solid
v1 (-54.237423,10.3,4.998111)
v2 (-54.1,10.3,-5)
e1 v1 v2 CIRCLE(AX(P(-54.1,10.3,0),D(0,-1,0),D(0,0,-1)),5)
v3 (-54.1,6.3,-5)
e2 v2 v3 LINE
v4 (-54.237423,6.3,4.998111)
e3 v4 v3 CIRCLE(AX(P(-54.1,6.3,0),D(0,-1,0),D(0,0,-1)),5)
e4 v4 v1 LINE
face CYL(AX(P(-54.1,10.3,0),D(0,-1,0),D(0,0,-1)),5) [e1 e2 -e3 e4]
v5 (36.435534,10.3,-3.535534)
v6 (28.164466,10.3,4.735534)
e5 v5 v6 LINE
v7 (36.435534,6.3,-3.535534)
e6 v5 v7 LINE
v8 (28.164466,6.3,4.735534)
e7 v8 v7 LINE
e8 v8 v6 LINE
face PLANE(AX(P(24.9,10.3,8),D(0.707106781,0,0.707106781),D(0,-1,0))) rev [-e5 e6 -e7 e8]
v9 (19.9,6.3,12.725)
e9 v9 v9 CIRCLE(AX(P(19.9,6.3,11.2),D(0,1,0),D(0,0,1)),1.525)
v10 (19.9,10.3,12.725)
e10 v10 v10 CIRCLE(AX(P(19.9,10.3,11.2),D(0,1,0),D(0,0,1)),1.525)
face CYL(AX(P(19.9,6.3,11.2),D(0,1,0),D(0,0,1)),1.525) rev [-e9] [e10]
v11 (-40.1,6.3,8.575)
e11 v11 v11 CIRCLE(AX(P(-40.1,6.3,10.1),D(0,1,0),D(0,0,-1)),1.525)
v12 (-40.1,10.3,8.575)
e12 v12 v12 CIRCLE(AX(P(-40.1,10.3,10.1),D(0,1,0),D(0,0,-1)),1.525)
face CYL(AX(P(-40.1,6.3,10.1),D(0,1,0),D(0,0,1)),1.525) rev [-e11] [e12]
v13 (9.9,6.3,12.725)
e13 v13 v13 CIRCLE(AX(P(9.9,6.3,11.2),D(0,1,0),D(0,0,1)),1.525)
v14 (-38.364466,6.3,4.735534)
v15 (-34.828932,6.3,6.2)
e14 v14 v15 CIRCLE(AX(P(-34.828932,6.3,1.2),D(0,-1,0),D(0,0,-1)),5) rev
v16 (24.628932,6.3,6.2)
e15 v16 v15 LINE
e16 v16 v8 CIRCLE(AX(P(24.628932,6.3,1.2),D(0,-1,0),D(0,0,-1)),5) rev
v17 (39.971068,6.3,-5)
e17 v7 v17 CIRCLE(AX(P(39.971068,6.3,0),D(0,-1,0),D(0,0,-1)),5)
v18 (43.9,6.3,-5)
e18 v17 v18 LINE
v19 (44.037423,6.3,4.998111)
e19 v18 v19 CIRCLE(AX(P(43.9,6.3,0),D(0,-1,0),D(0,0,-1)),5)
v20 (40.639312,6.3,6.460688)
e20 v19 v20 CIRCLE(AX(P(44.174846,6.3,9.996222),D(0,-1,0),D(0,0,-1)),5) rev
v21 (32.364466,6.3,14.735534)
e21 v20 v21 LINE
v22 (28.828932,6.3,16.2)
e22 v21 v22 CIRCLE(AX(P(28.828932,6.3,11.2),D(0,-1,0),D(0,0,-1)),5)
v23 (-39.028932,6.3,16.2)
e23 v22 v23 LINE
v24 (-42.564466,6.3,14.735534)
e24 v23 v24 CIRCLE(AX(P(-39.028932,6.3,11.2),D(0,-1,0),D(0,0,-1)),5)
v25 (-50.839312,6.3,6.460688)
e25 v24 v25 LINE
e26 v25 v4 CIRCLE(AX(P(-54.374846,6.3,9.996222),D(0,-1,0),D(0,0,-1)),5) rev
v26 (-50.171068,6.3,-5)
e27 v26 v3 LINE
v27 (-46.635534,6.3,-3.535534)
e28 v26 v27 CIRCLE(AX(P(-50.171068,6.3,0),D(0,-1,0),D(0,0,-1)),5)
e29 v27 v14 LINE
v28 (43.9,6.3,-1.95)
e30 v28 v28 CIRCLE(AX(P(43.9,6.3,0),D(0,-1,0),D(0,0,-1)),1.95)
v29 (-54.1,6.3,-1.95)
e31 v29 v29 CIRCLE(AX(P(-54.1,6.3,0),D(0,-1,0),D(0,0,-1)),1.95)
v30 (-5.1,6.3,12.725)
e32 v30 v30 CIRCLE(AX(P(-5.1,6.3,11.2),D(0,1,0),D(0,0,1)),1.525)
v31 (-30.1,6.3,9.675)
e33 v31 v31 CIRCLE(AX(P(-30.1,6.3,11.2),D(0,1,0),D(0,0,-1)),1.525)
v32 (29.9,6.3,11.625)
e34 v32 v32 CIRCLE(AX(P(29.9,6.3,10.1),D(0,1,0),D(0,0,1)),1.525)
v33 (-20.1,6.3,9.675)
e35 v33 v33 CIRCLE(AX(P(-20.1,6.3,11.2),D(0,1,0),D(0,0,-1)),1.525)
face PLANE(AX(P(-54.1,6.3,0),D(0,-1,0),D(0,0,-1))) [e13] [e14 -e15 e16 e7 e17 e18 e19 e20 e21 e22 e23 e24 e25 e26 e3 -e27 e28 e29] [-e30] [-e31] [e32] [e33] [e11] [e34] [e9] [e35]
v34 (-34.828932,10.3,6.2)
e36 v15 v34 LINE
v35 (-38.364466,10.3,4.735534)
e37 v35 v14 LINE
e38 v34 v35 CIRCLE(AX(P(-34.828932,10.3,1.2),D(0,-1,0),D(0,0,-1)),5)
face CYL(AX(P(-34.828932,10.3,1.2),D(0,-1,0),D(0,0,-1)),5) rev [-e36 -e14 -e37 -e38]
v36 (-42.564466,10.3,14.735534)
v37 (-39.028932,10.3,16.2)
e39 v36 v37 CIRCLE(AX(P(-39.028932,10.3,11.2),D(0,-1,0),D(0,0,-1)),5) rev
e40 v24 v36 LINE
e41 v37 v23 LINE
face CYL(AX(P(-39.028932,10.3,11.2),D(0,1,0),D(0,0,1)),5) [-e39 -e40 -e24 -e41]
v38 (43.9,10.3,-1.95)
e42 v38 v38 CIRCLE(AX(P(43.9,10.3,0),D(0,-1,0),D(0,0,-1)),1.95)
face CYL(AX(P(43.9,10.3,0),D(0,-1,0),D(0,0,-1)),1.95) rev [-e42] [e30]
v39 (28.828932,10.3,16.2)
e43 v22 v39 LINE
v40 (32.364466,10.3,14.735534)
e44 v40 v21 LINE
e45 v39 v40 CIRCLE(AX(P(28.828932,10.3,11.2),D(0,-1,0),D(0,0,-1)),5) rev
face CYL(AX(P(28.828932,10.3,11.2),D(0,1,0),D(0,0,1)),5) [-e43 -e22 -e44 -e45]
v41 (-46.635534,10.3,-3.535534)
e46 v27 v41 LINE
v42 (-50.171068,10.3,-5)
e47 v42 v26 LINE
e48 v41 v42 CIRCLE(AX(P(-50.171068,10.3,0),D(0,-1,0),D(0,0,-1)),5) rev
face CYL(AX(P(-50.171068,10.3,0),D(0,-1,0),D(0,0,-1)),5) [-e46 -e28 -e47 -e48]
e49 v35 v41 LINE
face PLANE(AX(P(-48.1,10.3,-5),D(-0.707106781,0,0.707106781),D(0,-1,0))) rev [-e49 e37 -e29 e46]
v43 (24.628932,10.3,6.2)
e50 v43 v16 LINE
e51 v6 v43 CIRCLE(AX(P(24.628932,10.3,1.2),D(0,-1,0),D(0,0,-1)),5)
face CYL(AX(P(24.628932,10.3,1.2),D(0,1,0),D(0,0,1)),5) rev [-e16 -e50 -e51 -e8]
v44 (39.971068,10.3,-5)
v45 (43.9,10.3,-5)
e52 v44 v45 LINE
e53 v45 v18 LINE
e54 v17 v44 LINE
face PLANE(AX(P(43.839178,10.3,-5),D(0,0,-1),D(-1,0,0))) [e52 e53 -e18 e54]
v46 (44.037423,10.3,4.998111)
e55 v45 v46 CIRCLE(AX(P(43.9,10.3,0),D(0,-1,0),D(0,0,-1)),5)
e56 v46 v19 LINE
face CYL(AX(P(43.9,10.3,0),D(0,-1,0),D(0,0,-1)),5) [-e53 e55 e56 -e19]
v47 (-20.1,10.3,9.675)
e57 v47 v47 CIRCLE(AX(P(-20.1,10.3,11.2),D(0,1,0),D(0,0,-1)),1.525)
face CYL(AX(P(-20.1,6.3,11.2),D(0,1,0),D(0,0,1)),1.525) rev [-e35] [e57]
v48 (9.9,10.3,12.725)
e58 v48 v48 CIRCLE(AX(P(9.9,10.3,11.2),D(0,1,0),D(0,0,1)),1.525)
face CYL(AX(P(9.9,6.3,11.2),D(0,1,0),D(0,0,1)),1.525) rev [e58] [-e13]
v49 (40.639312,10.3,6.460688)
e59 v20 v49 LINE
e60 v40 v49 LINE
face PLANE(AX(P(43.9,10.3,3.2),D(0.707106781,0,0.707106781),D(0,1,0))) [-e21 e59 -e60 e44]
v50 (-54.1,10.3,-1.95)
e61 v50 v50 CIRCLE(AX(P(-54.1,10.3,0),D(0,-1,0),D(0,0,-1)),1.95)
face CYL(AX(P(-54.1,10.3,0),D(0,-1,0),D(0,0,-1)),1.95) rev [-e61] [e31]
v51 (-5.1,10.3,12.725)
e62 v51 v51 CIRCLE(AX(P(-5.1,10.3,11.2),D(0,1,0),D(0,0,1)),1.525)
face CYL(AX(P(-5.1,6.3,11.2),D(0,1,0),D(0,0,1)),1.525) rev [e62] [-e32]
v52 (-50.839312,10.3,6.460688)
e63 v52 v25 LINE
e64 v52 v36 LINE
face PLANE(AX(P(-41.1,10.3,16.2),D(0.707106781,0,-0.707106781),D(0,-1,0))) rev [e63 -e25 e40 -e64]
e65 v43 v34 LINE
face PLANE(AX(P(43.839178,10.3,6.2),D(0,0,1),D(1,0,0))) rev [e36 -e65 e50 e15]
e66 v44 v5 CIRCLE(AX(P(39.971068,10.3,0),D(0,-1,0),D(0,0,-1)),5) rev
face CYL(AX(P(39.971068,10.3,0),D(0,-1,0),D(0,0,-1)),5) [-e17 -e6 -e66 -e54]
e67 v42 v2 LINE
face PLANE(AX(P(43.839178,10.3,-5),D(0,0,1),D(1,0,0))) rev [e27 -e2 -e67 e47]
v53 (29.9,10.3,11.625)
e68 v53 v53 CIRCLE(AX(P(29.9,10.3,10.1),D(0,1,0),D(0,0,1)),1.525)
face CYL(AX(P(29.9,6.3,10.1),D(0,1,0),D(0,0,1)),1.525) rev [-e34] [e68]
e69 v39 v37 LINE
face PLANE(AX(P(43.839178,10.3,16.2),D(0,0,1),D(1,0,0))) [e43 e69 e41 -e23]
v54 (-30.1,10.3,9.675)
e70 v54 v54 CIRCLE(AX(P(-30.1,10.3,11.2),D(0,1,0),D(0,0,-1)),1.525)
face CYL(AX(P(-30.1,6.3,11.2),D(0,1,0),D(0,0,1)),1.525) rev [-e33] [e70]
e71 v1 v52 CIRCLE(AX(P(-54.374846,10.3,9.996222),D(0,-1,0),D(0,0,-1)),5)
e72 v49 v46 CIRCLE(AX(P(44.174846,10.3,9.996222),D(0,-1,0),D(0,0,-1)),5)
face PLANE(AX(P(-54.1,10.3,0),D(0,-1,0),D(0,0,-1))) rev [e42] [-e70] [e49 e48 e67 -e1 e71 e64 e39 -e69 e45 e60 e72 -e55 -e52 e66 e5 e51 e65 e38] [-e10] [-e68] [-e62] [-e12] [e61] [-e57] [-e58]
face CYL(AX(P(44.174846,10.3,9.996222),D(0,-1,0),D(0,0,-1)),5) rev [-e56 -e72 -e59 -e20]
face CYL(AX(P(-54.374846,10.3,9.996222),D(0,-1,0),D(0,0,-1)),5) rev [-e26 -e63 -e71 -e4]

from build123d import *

# Parameters (mm, degrees)
BOSS_EXTRUDE1_START = 6.3
SKETCH1_R           = 1.95
BOSS_EXTRUDE1_DEPTH = 4
CHAMFER1_SIZE       = 13
CHAMFER2_SIZE       = 13
FILLET1_R           = 5
SKETCH2_R           = 1.525
CUT_EXTRUDE1_DEPTH  = 62.410503988


with BuildPart() as part:
    # Sketch1 → Boss-Extrude1 (new body)
    with BuildSketch(Plane(origin=(0, 0, 0), x_dir=(1, 0, 0), z_dir=(0, 1, 0)).offset(BOSS_EXTRUDE1_START)):
        with BuildLine():
            Line((-54.1, -5), (-54.1, -16.2))
            Line((-54.1, -16.2), (43.9, -16.2))
            Line((43.9, -16.2), (43.9, -5))
            ThreePointArc((43.9, -5), (48.9, 0), (43.9, 5))
            Line((43.9, 5), (24.9, 5))
            Line((24.9, 5), (24.9, -6.2))
            Line((24.9, -6.2), (-35.1, -6.2))
            Line((-35.1, -6.2), (-35.1, 5))
            Line((-35.1, 5), (-54.1, 5))
            ThreePointArc((-54.1, 5), (-59.1, 0), (-54.1, -5))
        make_face()
        with Locations(Location((43.9, 0, 0), (0, 0, 90))):
            Circle(SKETCH1_R, mode=Mode.SUBTRACT)
        with Locations(Location((-54.1, 0, 0), (0, 0, 90))):
            Circle(SKETCH1_R, mode=Mode.SUBTRACT)
    extrude(amount=BOSS_EXTRUDE1_DEPTH)

    # Chamfer1
    # the kernel refuses this chamfer: 13 mm, written as the material it takes off along each edge
    with BuildSketch(Plane(origin=(24.9, -27.131878844, -5), x_dir=(0.9996219169112968, 0, -0.027495876610586358), z_dir=(0, 1, 0))) as chamfer1_piece_1_section:
        Polygon((CHAMFER1_SIZE * 0.999621916911, -CHAMFER1_SIZE * 0.0274958766106), (-CHAMFER1_SIZE * 0.0274958766106, -CHAMFER1_SIZE * 0.999621916911), (0, 0), align=None)
    chamfer1_piece_1 = extrude(amount=70.863757687, mode=Mode.PRIVATE)
    chamfer1_piece_1 = split(chamfer1_piece_1, bisect_by=Plane(origin=(29.309865353, 8.3, 6.2), z_dir=(0, 0, -1)), keep=Keep.TOP, mode=Mode.PRIVATE)
    add(chamfer1_piece_1, mode=Mode.SUBTRACT)
    with BuildSketch(Plane(origin=(-35.1, -27.131878844, -5), x_dir=(0.027495876610586424, 0, 0.9996219169112968), z_dir=(0, 1, 0))) as chamfer1_piece_2_section:
        Polygon((CHAMFER1_SIZE * 0.999621916911, -CHAMFER1_SIZE * 0.0274958766106), (-CHAMFER1_SIZE * 0.0274958766106, -CHAMFER1_SIZE * 0.999621916911), (0, 0), align=None)
    chamfer1_piece_2 = extrude(amount=70.863757687, mode=Mode.PRIVATE)
    chamfer1_piece_2 = split(chamfer1_piece_2, bisect_by=Plane(origin=(-39.509865353, 8.3, 6.2), z_dir=(0, 0, -1)), keep=Keep.TOP, mode=Mode.PRIVATE)
    add(chamfer1_piece_2, mode=Mode.SUBTRACT)

    # Chamfer2
    # the kernel refuses this chamfer: 13 mm, written as the material it takes off along each edge
    with BuildSketch(Plane(origin=(43.9, -27.131878844, 16.2), x_dir=(0.02749587661058749, 0, -0.9996219169112966), z_dir=(0, 1, 0))) as chamfer2_piece_1_section:
        Polygon((CHAMFER2_SIZE * 0.999621916911, CHAMFER2_SIZE * 0.0274958766106), (-CHAMFER2_SIZE * 0.0274958766106, CHAMFER2_SIZE * 0.999621916911), (0, 0), align=None)
    chamfer2_piece_1 = extrude(amount=70.863757687, mode=Mode.PRIVATE)
    chamfer2_piece_1 = chamfer2_piece_1 - Plane(origin=(43.9, 8.3, 0), x_dir=(0, 0, 1), z_dir=(0, -1, 0)) * Cylinder(5, 194, mode=Mode.PRIVATE)
    add(chamfer2_piece_1, mode=Mode.SUBTRACT)
    with BuildSketch(Plane(origin=(-54.1, -27.131878844, 16.2), x_dir=(-0.027495876610587482, 0, -0.9996219169112966), z_dir=(0, 1, 0))) as chamfer2_piece_2_section:
        Polygon((CHAMFER2_SIZE * 0.999621916911, -CHAMFER2_SIZE * 0.0274958766106), (-CHAMFER2_SIZE * 0.0274958766106, -CHAMFER2_SIZE * 0.999621916911), (0, 0), align=None)
    chamfer2_piece_2 = extrude(amount=70.863757687, mode=Mode.PRIVATE)
    chamfer2_piece_2 = chamfer2_piece_2 - Plane(origin=(-54.1, 8.3, 0), x_dir=(0, 0, -1), z_dir=(0, -1, 0)) * Cylinder(5, 194, mode=Mode.PRIVATE)
    add(chamfer2_piece_2, mode=Mode.SUBTRACT)

    # Fillet1
    fillet1_edges = [part.edges().sort_by_distance(p)[0] for p in [
        (42.347223446, 8.3, 4.752776554),
        (-52.547223446, 8.3, 4.752776554),
        (37.9, 8.3, -5),
        (-48.1, 8.3, -5),
        (26.7, 8.3, 6.2),
        (-36.9, 8.3, 6.2),
        (-41.1, 8.3, 16.2),
        (30.9, 8.3, 16.2),
    ]]
    fillet(fillet1_edges, radius=FILLET1_R)

    # Sketch2 → Cut-Extrude1 (cut, through all)
    with BuildSketch(Plane(origin=(0, 10.3, 0), x_dir=(1, 0, 0), z_dir=(0, 1, 0))):
        with Locations(Location((29.9, -10.1, 0), (0, 0, 270))):
            Circle(SKETCH2_R)
        with Locations(Location((-5.1, -11.2, 0), (0, 0, 270))):
            Circle(SKETCH2_R)
        with Locations(Location((9.9, -11.2, 0), (0, 0, 270))):
            Circle(SKETCH2_R)
        with Locations(Location((-40.1, -10.1, 0), (0, 0, 90))):
            Circle(SKETCH2_R)
        with Locations(Location((-20.1, -11.2, 0), (0, 0, 90))):
            Circle(SKETCH2_R)
        with Locations(Location((19.9, -11.2, 0), (0, 0, 270))):
            Circle(SKETCH2_R)
        with Locations(Location((-30.1, -11.2, 0), (0, 0, 90))):
            Circle(SKETCH2_R)
    extrude(amount=-CUT_EXTRUDE1_DEPTH, mode=Mode.SUBTRACT)


solid = part.part
